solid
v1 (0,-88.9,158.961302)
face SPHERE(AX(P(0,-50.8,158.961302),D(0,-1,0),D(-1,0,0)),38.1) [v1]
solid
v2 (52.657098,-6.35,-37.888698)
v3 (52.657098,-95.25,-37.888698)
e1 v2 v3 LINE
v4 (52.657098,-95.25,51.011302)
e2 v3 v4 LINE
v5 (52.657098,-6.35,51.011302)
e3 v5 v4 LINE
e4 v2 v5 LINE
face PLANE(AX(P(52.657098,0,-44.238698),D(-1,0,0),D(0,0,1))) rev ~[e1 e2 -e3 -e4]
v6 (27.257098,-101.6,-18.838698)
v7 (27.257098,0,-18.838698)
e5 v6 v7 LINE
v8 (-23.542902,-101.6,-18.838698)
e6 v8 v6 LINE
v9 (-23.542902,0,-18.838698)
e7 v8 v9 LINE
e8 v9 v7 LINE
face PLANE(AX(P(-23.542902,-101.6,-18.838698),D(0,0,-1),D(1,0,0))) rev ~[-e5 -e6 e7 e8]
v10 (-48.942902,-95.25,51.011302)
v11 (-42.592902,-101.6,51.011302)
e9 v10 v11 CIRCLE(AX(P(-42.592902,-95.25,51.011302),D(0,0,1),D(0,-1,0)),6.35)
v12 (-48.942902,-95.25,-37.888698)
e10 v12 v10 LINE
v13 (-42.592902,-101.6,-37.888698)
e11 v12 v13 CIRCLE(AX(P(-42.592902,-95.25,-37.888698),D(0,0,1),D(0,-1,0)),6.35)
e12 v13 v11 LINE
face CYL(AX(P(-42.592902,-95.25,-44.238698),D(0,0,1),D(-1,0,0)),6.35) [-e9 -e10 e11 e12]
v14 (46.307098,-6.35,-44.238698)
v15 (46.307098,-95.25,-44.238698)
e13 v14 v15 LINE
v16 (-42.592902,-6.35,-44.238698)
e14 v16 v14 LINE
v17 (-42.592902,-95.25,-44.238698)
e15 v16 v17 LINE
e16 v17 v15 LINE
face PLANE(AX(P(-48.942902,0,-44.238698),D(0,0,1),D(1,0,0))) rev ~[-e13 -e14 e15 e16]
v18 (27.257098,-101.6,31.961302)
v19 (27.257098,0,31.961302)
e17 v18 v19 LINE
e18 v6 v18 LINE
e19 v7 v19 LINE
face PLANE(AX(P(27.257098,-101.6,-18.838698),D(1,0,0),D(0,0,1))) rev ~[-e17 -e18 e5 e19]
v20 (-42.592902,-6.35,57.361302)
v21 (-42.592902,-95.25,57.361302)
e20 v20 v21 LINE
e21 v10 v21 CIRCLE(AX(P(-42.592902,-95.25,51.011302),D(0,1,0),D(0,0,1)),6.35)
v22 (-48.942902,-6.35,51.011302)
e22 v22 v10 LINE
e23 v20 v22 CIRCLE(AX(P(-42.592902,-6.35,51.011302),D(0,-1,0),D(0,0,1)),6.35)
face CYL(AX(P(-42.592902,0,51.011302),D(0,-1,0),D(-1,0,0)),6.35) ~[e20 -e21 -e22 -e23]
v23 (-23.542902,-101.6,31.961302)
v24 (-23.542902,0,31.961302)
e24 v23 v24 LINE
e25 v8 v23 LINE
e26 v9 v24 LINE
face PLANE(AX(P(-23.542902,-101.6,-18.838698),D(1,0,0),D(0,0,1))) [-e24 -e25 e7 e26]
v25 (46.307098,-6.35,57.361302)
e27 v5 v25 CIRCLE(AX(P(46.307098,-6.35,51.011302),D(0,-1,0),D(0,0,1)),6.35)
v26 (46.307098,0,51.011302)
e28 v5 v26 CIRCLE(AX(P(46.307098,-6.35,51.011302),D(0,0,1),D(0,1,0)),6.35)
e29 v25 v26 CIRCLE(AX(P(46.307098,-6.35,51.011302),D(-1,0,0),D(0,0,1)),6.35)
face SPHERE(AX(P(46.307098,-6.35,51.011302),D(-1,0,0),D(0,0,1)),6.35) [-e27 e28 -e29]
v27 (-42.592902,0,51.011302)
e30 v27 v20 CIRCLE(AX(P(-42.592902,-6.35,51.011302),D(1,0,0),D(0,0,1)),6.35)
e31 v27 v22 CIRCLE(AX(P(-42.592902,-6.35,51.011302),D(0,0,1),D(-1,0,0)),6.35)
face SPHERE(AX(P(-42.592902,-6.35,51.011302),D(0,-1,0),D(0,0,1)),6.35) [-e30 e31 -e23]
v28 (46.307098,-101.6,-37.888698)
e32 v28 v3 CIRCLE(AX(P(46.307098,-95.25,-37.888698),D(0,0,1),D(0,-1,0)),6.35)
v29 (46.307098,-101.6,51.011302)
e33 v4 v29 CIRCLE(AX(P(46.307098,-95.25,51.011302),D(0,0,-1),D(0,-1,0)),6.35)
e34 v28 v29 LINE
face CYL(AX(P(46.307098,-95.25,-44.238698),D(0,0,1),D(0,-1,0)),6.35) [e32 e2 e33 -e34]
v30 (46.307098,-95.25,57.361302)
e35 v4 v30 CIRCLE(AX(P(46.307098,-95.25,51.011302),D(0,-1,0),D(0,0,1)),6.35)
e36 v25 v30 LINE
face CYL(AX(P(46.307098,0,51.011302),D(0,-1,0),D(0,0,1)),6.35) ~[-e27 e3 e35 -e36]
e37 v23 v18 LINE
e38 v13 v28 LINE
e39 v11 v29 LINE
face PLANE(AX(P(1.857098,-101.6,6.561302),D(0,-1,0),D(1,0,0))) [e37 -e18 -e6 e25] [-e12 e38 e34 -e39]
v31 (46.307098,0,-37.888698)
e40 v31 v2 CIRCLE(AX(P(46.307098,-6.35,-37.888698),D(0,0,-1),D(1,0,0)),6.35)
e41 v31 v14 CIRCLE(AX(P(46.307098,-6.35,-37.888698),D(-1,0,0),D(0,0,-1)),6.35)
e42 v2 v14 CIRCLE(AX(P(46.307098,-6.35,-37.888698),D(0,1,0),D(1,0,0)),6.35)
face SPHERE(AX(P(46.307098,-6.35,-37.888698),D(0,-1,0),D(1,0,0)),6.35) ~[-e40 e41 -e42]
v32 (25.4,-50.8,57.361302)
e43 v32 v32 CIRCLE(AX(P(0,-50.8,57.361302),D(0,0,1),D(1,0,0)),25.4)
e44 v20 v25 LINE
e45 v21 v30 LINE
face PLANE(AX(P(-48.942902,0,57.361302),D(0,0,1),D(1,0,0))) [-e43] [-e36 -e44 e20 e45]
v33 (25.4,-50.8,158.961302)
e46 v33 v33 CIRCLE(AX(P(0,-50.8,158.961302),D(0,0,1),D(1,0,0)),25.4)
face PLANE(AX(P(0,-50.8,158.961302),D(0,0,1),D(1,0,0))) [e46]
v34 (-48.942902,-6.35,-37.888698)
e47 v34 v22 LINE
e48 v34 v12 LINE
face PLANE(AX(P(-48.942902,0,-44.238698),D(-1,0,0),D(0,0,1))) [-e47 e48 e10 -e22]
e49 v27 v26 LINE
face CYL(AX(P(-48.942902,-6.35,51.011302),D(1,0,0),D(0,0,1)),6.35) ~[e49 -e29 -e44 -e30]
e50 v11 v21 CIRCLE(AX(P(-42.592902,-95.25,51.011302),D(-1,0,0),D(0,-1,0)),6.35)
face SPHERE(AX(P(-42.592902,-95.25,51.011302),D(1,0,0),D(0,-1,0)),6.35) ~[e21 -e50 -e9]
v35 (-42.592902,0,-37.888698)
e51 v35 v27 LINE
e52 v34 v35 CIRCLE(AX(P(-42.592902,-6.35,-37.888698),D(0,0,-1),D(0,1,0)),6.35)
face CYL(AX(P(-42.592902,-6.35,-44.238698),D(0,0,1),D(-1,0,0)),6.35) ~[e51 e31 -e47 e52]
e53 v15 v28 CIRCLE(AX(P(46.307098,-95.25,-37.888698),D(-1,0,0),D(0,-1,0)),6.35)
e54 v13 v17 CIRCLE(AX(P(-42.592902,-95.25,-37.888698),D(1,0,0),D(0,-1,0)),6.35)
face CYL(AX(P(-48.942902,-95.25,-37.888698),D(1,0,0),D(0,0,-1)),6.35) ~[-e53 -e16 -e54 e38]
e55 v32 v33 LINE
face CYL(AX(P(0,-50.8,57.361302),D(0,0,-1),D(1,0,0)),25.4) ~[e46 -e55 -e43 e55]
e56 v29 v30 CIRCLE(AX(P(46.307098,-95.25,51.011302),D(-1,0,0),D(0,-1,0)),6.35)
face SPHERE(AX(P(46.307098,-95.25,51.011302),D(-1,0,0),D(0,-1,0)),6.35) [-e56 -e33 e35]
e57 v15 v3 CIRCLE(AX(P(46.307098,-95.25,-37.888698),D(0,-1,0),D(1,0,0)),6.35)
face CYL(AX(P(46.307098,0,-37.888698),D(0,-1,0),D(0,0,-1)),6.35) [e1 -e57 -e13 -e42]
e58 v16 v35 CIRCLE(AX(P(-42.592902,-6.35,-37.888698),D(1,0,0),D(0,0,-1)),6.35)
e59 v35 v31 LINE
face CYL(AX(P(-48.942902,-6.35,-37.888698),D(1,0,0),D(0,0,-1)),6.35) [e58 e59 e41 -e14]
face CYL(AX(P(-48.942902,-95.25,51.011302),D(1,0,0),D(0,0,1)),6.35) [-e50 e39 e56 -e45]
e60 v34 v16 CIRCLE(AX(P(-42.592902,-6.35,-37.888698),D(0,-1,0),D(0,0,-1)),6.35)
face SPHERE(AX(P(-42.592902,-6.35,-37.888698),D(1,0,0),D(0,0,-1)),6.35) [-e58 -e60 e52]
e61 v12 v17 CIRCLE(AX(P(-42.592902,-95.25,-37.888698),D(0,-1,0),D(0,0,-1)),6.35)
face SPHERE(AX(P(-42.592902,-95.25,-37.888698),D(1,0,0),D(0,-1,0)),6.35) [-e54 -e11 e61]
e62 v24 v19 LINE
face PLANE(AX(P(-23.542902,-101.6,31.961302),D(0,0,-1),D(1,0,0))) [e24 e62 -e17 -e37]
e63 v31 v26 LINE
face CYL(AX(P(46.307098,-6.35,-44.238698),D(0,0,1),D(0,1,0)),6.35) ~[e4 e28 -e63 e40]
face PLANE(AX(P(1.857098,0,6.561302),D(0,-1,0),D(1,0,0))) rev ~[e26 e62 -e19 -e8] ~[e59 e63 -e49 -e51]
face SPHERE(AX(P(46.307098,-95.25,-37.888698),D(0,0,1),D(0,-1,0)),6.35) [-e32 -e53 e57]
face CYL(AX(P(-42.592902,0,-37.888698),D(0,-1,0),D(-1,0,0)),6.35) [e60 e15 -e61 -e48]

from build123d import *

# Parameters (mm, degrees)
F0_W     = 101.6
F0_H     = 101.6
F1_DEPTH = 101.6
F2_R     = 25.4
F3_DEPTH = 101.6
F6_W     = 50.8
F6_H     = 50.8
F7_DEPTH = 101.6
F8_R     = 6.35


# Not quite as in the source:
# - a feature names something its author has since deleted; it is built from what else it names


with BuildPart() as f1:
    # F0 (on Front) → F1 (new body)
    with BuildSketch(Plane.XZ):
        with Locations((1.857098192, 6.5613021186)):
            Rectangle(F0_W, F0_H)
    extrude(amount=F1_DEPTH)

    # F2 (on face) → F3 (join)
    with BuildSketch(Plane.XY.offset(57.3613021186)):
        with Locations((0, -50.8)):
            Circle(F2_R)
    extrude(amount=F3_DEPTH)

    # F6 (on face) → F7 (cut)
    with BuildSketch(Plane.XZ.offset(101.6)):
        with Locations((1.857098192, 6.5613021186)):
            Rectangle(F6_W, F6_H)
    extrude(amount=-F7_DEPTH, mode=Mode.SUBTRACT)

    # F8
    f8_edges = [f1.edges().sort_by_distance(p)[0] for p in [
        (1.857098, -101.6, 57.361302),
        (52.657098, -101.6, 6.561302),
        (1.857098, -101.6, -44.238698),
        (-48.942902, -101.6, 6.561302),
        (-48.942902, -50.8, 57.361302),
        (1.857098, 0, 57.361302),
        (52.657098, -50.8, 57.361302),
        (52.657098, -50.8, -44.238698),
        (52.657098, 0, 6.561302),
        (1.857098, 0, -44.238698),
        (-48.942902, -50.8, -44.238698),
        (-48.942902, 0, 6.561302),
    ]]
    fillet(f8_edges, radius=F8_R)


with BuildPart() as f5:
    # F4 (on face) → F5 (revolve)
    with BuildSketch(Plane.XY.offset(158.9613021186)):
        with BuildLine():
            Line((0, -25.4), (0, -12.7))
            ThreePointArc((0, -12.7), (-38.1, -50.8), (0, -88.9))
            Line((0, -88.9), (0, -76.2))
            ThreePointArc((0, -76.2), (-25.4, -50.8), (0, -25.4))
        make_face()
        with BuildLine():
            Line((0, -76.2), (0, -25.4))
            ThreePointArc((0, -25.4), (-25.4, -50.8), (0, -76.2))
        make_face()
    revolve(axis=Axis((0, -50.8, 158.9613021186), (0, -1, 0)))


solid = Compound([f1.part, f5.part])
